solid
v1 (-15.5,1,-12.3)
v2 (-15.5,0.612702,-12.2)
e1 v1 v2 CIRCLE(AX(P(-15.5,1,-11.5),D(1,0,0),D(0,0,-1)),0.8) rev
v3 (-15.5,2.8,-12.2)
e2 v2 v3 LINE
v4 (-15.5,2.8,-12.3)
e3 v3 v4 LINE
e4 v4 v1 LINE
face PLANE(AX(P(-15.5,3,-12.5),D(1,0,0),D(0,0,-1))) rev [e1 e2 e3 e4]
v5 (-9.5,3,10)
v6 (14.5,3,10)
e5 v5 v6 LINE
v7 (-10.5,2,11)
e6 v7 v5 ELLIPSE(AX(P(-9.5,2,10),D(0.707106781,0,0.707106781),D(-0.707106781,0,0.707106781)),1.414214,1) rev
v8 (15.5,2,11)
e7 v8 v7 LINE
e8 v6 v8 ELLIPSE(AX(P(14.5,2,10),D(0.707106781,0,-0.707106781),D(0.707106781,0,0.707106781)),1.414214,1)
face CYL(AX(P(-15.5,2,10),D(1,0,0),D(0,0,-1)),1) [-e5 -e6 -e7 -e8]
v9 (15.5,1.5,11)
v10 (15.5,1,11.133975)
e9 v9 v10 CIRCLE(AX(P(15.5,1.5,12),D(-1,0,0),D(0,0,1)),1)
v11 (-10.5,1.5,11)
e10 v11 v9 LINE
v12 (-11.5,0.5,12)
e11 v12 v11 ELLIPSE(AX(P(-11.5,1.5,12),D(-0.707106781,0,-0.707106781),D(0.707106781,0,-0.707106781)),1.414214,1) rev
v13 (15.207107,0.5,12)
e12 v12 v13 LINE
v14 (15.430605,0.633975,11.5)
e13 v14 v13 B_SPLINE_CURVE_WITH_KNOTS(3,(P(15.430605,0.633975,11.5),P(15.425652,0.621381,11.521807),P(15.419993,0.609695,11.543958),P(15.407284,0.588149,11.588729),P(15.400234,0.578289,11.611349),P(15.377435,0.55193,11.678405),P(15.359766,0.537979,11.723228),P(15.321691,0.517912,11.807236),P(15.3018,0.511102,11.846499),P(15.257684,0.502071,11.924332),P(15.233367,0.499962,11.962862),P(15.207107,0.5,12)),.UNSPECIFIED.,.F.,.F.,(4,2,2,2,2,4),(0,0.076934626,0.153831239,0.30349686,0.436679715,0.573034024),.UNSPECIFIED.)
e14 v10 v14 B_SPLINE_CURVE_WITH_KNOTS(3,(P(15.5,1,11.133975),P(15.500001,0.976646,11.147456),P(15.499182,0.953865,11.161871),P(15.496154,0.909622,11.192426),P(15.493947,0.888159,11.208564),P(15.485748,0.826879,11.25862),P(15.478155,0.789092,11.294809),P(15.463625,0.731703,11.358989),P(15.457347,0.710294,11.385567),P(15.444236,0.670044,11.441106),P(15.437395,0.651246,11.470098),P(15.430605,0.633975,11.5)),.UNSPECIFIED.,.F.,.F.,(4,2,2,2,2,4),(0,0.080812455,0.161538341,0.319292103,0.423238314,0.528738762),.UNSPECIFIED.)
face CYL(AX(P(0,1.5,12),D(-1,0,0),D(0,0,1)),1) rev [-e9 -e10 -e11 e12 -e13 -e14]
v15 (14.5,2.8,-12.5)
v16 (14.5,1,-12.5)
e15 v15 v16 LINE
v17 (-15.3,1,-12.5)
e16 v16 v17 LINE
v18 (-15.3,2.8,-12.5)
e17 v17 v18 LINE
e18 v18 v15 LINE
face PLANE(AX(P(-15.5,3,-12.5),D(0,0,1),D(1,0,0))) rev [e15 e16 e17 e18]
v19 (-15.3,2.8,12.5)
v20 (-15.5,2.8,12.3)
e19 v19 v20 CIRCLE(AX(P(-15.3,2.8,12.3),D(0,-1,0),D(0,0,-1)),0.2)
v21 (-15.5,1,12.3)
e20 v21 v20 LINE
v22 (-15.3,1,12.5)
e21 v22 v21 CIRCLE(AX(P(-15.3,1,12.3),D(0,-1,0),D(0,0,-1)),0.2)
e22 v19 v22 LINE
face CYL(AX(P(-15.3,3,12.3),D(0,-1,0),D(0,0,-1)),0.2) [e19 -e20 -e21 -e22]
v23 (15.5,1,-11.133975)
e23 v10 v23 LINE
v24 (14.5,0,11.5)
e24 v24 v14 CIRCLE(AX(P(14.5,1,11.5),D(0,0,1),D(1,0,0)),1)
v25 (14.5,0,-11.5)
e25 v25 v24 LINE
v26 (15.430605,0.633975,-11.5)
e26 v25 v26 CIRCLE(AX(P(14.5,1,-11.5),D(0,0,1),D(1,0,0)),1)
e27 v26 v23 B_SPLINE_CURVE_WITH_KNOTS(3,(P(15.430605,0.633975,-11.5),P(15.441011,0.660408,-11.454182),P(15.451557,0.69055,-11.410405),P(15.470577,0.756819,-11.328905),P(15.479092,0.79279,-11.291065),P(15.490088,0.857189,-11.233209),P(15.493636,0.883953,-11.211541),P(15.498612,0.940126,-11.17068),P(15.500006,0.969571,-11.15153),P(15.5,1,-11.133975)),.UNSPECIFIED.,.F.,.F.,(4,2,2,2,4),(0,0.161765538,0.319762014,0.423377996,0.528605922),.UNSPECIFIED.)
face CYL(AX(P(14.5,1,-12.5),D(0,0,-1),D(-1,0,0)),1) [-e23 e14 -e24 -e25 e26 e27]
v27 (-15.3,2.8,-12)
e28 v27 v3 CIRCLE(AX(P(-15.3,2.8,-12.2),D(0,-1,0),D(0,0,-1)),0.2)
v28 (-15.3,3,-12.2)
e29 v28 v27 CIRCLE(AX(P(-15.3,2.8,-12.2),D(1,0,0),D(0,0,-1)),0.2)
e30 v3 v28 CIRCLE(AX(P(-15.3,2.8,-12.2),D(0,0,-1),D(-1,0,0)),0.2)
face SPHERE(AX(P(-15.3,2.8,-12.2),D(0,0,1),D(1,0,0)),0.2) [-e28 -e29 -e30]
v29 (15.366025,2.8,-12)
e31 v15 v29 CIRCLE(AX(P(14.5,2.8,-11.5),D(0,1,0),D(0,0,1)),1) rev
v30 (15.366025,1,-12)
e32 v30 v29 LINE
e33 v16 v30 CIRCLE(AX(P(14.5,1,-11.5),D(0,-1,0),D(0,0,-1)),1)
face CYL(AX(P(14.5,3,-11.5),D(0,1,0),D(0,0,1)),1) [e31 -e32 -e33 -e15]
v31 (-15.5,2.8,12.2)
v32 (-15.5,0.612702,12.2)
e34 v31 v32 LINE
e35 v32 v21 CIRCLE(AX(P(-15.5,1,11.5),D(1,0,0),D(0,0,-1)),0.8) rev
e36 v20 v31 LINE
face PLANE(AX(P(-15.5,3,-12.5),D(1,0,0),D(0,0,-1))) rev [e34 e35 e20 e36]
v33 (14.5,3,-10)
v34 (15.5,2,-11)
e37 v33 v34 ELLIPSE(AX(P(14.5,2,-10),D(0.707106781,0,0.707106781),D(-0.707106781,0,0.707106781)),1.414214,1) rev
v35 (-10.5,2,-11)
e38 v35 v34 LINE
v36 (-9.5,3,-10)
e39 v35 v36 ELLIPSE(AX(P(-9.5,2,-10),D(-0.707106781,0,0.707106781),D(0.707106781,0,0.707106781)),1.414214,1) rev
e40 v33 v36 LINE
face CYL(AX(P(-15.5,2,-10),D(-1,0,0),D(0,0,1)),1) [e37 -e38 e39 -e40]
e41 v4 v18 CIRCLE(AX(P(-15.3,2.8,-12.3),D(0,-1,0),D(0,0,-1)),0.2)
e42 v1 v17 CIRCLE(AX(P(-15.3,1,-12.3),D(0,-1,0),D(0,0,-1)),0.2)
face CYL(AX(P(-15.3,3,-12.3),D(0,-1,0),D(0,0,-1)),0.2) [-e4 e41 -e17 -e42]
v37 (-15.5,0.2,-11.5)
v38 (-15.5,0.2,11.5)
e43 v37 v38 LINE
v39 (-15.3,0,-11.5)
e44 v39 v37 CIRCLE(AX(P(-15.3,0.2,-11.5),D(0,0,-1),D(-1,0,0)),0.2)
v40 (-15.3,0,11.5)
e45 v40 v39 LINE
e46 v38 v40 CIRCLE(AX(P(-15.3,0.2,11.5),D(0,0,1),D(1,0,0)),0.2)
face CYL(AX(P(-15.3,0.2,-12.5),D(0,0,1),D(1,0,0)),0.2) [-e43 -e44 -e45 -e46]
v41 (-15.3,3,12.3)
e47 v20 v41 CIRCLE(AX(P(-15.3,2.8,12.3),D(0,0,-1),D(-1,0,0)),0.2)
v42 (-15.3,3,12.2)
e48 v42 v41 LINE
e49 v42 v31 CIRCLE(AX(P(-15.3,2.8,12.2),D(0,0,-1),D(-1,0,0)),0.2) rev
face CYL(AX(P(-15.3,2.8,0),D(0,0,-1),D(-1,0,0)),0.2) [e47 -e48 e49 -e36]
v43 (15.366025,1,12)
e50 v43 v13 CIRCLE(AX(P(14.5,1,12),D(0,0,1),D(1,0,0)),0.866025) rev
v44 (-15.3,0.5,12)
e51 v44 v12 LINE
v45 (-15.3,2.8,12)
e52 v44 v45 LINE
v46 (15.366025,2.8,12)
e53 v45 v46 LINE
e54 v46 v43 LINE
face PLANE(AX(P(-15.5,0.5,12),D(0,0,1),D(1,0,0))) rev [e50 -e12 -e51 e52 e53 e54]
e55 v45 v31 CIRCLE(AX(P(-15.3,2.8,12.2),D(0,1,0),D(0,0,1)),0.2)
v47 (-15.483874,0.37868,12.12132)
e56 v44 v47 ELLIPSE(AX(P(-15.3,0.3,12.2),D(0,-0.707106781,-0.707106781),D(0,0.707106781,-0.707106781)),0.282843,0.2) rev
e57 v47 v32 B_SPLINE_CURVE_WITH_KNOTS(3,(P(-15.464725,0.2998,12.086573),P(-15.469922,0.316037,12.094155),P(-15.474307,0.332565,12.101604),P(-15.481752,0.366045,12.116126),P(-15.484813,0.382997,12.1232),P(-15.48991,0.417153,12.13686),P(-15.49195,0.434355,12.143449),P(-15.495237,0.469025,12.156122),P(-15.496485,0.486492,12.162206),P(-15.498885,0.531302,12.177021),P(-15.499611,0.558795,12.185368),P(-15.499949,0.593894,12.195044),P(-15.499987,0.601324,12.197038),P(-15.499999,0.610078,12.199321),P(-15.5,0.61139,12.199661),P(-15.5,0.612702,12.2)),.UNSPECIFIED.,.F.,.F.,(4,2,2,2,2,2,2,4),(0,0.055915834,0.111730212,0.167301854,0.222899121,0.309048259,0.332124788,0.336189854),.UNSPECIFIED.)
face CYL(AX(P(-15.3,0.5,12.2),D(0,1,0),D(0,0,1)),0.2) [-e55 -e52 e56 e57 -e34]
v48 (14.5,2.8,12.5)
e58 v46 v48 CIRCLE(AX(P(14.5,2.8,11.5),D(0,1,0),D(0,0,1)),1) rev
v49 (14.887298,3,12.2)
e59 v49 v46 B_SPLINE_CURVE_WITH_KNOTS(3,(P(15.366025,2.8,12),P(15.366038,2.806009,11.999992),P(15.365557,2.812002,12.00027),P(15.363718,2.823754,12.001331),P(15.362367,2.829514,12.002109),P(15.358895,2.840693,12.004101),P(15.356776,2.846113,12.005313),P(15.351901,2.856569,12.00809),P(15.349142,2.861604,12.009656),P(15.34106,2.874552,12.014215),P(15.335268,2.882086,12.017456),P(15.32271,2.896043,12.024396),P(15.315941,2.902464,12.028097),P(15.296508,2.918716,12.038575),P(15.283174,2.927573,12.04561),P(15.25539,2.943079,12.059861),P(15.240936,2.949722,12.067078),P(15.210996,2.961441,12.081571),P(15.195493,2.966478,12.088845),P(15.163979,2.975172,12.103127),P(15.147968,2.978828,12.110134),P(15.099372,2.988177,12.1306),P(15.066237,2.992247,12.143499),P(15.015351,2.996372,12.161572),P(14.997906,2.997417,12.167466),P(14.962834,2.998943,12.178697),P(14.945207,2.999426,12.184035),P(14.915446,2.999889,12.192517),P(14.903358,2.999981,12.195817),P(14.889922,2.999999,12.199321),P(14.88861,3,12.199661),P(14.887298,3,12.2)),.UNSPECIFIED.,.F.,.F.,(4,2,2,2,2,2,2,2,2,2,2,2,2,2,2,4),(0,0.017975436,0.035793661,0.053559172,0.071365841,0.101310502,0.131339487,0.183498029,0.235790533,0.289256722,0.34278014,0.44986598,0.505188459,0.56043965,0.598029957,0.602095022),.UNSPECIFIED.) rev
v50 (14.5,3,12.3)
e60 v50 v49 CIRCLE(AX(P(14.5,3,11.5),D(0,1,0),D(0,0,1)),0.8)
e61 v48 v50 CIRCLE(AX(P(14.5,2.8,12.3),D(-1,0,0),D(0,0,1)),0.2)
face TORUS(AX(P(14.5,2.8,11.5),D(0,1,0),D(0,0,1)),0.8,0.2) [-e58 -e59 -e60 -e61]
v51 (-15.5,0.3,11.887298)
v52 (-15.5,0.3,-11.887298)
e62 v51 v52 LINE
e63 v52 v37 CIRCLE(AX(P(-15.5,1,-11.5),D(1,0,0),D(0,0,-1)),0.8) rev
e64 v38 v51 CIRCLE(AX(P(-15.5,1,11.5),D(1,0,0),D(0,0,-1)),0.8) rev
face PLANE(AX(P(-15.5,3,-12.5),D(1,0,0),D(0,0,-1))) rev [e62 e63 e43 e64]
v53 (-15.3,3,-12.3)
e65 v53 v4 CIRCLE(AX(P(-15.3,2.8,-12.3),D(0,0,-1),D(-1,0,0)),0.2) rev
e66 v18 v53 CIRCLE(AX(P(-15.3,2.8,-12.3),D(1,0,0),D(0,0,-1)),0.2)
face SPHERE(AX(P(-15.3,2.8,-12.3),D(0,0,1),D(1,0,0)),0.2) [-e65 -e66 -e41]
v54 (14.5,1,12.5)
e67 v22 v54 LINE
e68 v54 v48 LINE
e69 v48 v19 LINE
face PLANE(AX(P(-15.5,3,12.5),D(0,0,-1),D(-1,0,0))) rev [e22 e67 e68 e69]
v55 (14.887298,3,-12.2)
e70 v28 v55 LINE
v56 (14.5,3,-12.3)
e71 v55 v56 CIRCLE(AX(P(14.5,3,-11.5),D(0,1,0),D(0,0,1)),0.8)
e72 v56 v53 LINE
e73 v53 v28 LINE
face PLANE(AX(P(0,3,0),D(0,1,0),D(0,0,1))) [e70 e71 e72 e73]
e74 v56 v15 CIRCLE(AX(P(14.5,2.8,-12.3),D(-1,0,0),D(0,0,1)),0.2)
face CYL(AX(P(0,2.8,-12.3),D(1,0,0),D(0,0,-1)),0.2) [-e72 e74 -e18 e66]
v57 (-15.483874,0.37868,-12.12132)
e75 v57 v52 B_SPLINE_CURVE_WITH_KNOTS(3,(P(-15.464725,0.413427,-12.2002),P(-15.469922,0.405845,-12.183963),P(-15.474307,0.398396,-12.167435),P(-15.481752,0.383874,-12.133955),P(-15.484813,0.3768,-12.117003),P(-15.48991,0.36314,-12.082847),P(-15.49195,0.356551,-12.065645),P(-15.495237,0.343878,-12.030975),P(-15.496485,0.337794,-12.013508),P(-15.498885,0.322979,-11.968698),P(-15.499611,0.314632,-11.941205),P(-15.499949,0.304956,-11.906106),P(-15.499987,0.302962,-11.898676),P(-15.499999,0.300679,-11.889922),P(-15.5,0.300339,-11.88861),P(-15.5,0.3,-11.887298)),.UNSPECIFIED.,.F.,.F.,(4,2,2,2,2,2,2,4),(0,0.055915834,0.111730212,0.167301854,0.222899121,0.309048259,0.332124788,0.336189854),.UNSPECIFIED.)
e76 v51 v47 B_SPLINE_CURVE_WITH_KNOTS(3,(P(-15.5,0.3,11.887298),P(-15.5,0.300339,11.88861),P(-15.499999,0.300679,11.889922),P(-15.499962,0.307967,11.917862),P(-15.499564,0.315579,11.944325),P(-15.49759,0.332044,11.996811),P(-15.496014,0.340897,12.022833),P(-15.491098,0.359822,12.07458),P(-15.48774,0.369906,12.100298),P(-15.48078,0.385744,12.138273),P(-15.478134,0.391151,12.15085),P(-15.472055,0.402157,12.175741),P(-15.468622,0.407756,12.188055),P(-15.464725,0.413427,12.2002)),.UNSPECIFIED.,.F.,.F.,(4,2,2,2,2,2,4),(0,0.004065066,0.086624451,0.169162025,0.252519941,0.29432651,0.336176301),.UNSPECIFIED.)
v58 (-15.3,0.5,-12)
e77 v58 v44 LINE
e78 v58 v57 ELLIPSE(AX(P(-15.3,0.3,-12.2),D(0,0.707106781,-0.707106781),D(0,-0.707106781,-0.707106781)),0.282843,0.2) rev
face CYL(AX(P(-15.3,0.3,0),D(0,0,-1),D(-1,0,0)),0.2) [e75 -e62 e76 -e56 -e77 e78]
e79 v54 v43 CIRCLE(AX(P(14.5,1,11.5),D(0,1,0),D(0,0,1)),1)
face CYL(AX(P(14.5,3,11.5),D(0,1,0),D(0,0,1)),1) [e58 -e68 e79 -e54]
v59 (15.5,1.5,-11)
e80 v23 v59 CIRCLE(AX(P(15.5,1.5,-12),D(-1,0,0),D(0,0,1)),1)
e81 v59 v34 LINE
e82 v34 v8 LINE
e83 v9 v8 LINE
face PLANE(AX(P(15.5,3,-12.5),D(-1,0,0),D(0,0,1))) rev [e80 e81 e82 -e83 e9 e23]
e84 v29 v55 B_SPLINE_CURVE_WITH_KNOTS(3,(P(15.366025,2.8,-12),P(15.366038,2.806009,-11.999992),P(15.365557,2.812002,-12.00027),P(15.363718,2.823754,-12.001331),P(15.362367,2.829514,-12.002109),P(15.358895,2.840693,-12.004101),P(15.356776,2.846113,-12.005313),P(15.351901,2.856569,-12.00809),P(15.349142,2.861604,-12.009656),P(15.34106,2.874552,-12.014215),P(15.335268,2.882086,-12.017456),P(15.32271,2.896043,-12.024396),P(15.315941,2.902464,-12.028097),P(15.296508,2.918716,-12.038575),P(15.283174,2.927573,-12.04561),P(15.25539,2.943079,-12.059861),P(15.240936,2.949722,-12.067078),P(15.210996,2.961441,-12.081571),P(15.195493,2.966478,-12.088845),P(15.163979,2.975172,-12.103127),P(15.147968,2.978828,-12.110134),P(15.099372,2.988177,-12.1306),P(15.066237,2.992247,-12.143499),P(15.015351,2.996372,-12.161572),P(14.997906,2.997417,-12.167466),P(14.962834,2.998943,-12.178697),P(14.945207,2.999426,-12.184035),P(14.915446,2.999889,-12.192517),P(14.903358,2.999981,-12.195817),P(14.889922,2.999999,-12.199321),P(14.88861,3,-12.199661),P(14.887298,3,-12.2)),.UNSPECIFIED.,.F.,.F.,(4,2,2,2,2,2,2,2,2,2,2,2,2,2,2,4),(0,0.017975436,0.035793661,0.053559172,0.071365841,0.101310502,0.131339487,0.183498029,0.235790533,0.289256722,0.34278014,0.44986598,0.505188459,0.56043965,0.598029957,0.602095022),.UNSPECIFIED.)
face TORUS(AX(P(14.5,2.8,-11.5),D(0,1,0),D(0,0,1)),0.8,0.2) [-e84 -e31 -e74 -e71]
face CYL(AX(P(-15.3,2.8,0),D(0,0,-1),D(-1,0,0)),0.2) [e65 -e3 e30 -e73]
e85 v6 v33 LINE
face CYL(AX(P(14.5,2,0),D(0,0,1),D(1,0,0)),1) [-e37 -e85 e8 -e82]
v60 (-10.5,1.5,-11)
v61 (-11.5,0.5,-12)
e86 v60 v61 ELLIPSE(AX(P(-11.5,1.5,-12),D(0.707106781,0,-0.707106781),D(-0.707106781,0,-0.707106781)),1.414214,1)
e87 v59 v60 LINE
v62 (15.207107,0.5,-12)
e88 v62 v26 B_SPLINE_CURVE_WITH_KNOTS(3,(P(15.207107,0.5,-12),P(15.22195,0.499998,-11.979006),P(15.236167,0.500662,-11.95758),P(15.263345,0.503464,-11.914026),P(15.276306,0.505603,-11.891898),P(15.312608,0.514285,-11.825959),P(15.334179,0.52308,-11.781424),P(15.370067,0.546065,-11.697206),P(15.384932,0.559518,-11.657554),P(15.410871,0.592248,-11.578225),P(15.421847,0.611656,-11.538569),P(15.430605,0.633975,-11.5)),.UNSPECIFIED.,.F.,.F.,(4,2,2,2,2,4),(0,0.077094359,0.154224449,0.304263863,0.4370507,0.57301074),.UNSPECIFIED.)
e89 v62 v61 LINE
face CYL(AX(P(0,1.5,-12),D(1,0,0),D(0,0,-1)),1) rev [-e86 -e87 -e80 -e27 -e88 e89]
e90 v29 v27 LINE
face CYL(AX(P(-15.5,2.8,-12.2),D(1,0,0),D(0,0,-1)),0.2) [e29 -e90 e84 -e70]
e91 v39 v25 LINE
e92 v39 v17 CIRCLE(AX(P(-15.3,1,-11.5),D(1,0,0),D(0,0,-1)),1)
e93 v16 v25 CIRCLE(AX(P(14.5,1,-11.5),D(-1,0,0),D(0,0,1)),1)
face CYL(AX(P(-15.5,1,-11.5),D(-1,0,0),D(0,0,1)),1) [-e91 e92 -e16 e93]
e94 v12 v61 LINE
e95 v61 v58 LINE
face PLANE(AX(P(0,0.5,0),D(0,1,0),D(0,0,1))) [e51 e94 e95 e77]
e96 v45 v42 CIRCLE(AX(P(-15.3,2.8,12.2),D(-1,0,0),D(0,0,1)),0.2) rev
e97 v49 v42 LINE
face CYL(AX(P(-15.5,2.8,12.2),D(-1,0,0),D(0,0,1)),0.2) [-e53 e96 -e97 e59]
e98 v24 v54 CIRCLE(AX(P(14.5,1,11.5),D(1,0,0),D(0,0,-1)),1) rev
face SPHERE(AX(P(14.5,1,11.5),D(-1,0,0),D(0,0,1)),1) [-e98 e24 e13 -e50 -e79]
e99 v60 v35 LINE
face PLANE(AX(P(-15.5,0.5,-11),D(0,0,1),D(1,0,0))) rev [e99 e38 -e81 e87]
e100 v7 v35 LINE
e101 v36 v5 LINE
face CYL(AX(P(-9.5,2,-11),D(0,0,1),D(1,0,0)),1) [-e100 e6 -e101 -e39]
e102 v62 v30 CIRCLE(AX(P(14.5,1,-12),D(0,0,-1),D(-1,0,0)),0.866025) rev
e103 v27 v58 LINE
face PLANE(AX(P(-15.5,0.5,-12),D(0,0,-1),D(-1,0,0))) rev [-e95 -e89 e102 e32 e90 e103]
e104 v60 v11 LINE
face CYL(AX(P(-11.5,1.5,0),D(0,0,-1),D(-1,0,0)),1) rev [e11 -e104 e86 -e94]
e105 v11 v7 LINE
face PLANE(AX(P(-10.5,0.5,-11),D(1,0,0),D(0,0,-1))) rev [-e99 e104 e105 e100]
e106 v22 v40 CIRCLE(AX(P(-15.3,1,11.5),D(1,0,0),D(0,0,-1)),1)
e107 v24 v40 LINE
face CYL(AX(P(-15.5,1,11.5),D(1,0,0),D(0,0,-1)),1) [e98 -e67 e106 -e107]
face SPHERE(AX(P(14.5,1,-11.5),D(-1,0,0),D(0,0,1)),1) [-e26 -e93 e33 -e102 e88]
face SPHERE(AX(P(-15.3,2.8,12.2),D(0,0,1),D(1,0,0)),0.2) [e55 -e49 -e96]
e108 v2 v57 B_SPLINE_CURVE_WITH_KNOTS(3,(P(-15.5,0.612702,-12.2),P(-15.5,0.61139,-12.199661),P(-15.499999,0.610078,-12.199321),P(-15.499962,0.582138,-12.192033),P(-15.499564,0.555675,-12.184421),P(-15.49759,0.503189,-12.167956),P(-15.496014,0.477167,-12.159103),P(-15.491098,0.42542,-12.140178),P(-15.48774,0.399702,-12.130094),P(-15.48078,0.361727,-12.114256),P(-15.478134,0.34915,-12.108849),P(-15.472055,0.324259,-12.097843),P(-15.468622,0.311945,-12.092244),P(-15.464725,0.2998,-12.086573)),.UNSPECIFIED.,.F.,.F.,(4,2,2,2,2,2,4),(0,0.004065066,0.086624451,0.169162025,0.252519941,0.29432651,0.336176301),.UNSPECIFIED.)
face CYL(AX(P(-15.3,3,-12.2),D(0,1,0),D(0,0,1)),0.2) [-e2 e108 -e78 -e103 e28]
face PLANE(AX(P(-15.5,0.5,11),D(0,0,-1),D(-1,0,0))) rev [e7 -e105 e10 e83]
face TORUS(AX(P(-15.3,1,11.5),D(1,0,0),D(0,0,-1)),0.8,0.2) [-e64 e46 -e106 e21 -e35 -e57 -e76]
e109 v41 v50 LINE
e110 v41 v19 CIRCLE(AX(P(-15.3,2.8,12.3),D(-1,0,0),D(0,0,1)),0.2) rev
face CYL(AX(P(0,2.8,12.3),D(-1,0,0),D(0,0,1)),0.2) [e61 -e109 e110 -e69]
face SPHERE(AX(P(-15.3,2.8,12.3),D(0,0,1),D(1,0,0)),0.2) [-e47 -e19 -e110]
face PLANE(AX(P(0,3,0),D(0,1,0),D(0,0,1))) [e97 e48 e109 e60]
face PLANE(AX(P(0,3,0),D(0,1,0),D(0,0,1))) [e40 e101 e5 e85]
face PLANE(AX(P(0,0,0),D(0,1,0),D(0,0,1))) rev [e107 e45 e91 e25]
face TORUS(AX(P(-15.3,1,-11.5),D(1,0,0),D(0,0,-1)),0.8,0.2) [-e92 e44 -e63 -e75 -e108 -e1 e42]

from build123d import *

# Parameters (mm, degrees)
SKETCH_2_W          = 31
SKETCH_2_H          = 25
EXTRUDE_1_DEPTH     = 3
SKETCH_3_W          = 31
SKETCH_3_H          = 1
CUT_EXTRUDE_1_DEPTH = 2.5
SKETCH_4_W          = 5
SKETCH_4_H          = 22
CUT_EXTRUDE_2_DEPTH = 2.5
FILLET_11_R         = 1
FILLET_12_R         = 1
FILLET_13_R         = 1
FILLET_18_R         = 1
FILLET_19_R         = 1
FILLET_20_R         = 1
FILLET_21_R         = 1
FILLET_22_R         = 0.2
FILLET_23_R         = 0.2
FILLET_24_R         = 0.2


# Some blends are built 0.0001 mm under size
with BuildPart() as part:
    # 草图2 → 凸台-拉伸1 (new body)
    with BuildSketch(Plane(origin=(0, 0, 0), x_dir=(1, 0, 0), z_dir=(0, 1, 0))):
        Rectangle(SKETCH_2_W, SKETCH_2_H)
    extrude(amount=EXTRUDE_1_DEPTH)

    # 草图3 → 切除-拉伸1 (cut)
    with BuildSketch(Plane(origin=(0, 3, 0), x_dir=(1, 0, 0), z_dir=(0, 1, 0))):
        with Locations((0, 11.5)):
            Rectangle(SKETCH_3_W, SKETCH_3_H)
        with Locations((0, -11.5)):
            Rectangle(SKETCH_3_W, SKETCH_3_H)
    extrude(amount=-CUT_EXTRUDE_1_DEPTH, mode=Mode.SUBTRACT)

    # 草图4 → 切除-拉伸2 (cut)
    with BuildSketch(Plane(origin=(0, 3, 0), x_dir=(1, 0, 0), z_dir=(0, 1, 0))):
        with Locations((-13, 0)):
            Rectangle(SKETCH_4_W, SKETCH_4_H)
    extrude(amount=-CUT_EXTRUDE_2_DEPTH, mode=Mode.SUBTRACT)

    # 圆角11
    fillet_11_edges = [part.edges().sort_by_distance(p)[0] for p in [
        (0, 0, 12.5),
    ]]
    fillet(fillet_11_edges, radius=FILLET_11_R)

    # 圆角12
    fillet_12_edges = [part.edges().sort_by_distance(p)[0] for p in [
        (0, 0, -12.5),
    ]]
    fillet(fillet_12_edges, radius=FILLET_12_R)

    # 圆角13
    # the kernel refuses this fillet: 1 mm, written as the material it takes off along each edge
    with BuildSketch(Plane(origin=(15.5, 1, 12.5), x_dir=(0, 0, -1), z_dir=(0, 1, 0))) as fillet_13_piece_1:
        with BuildLine():
            CenterArc((FILLET_13_R, FILLET_13_R), FILLET_13_R, 180, 90)
            Line((0, FILLET_13_R), (0, 0))
            Line((0, 0), (FILLET_13_R, 0))
        make_face()
    extrude(amount=4.5, mode=Mode.SUBTRACT)
    with BuildSketch(Plane(origin=(15.5, 1, -12.5), x_dir=(0, 0, 1), z_dir=(0, 1, 0))) as fillet_13_piece_2:
        with BuildLine():
            CenterArc((FILLET_13_R, -FILLET_13_R), FILLET_13_R, 90, 90)
            Line((0, -FILLET_13_R), (0, 0))
            Line((0, 0), (FILLET_13_R, 0))
        make_face()
    extrude(amount=4.5, mode=Mode.SUBTRACT)
    with BuildSketch(Plane(origin=(15.5, 0, -11.5), x_dir=(0, 1, 0), z_dir=(0, 0, 1))) as fillet_13_piece_3:
        with BuildLine():
            CenterArc((FILLET_13_R, FILLET_13_R), FILLET_13_R, 180, 90)
            Line((0, FILLET_13_R), (0, 0))
            Line((0, 0), (FILLET_13_R, 0))
        make_face()
    extrude(amount=23, mode=Mode.SUBTRACT)
    with BuildSketch(Plane(origin=(15.5, 1, -11.5), x_dir=(0, -1, 0), z_dir=(0, 0, 1))) as fillet_13_piece_4:
        with BuildLine():
            CenterArc((1 - FILLET_13_R, -FILLET_13_R), FILLET_13_R, 0, 90)
            Line((1, -FILLET_13_R), (1, 0))
            Line((1, 0), (1 - FILLET_13_R, 0))
        make_face()
    revolve(axis=Axis((15.5, 1, -11.5), (1, 0, 0)), revolution_arc=90, mode=Mode.SUBTRACT)
    with BuildSketch(Plane(origin=(15.5, 1, 11.5), x_dir=(0, 0, 1), z_dir=(0, 1, 0))) as fillet_13_piece_5:
        with BuildLine():
            CenterArc((1 - FILLET_13_R, -FILLET_13_R), FILLET_13_R, 0, 90)
            Line((1, -FILLET_13_R), (1, 0))
            Line((1, 0), (1 - FILLET_13_R, 0))
        make_face()
    revolve(axis=Axis((15.5, 1, 11.5), (1, 0, 0)), revolution_arc=90, mode=Mode.SUBTRACT)

    # 圆角18
    fillet_18_edges = [part.edges().sort_by_distance(p)[0] for p in [
        (15.5, 3, 0),
        (2.5, 3, 11),
        (2.5, 3, -11),
        (-10.5, 3, 0),
    ]]
    fillet(fillet_18_edges, radius=FILLET_18_R)

    # 圆角19
    fillet_19_edges = [part.edges().sort_by_distance(p)[0] for p in [
        (-10.5, 0.5, 0),
    ]]
    fillet(fillet_19_edges, radius=FILLET_19_R)

    # 圆角20
    fillet_20_edges = [part.edges().sort_by_distance(p)[0] for p in [
        (1.933012702, 0.5, -11),
    ]]
    fillet(fillet_20_edges, radius=FILLET_20_R - 0.0001)  # a hair under: the kernel refuses the full size

    # 圆角21
    fillet_21_edges = [part.edges().sort_by_distance(p)[0] for p in [
        (1.933012702, 0.5, 11),
    ]]
    fillet(fillet_21_edges, radius=FILLET_21_R - 0.0001)  # a hair under: the kernel refuses the full size

    # 圆角22
    fillet_22_edges = [part.edges().sort_by_distance(p)[0] for p in [
        (-15.5, 3, 12.25),
        (-0.5, 3, 12.5),
        (-0.066987298, 3, 12),
        (15, 3, 12.366025404),
    ]]
    fillet(fillet_22_edges, radius=FILLET_22_R)

    # 圆角23
    fillet_23_edges = [part.edges().sort_by_distance(p)[0] for p in [
        (-15.5, 3, -12.25),
        (-0.5, 3, -12.5),
        (-0.066987298, 3, -12),
        (15, 3, -12.366025404),
    ]]
    fillet(fillet_23_edges, radius=FILLET_23_R)

    # 圆角24
    # the kernel refuses this fillet: 0.2 mm, written as the material it takes off along each edge
    with BuildSketch(Plane(origin=(-15.3, 2.8, 12.2), x_dir=(0, 0, -1), z_dir=(-1, 0, 0))) as fillet_24_piece_1_section:
        Polygon((0, 0), (FILLET_24_R, 0), (FILLET_24_R, -FILLET_24_R), (0, -FILLET_24_R), align=None)
    fillet_24_piece_1 = extrude(amount=FILLET_24_R, mode=Mode.PRIVATE)
    fillet_24_piece_1 = fillet_24_piece_1 - Plane(origin=(-15.3, 2.8, 12.2), x_dir=(0, -0.7071067811865475, 0.7071067811865475), z_dir=(-1, 0, 0)) * Sphere(FILLET_24_R, mode=Mode.PRIVATE)
    add(fillet_24_piece_1, mode=Mode.SUBTRACT)
    with BuildSketch(Plane(origin=(-15.3, 2.8, 12.3), x_dir=(0, 0, 1), z_dir=(-1, 0, 0))) as fillet_24_piece_2_section:
        Polygon((0, 0), (FILLET_24_R, 0), (FILLET_24_R, FILLET_24_R), (0, FILLET_24_R), align=None)
    fillet_24_piece_2 = extrude(amount=FILLET_24_R, mode=Mode.PRIVATE)
    fillet_24_piece_2 = fillet_24_piece_2 - Plane(origin=(-15.3, 2.8, 12.3), x_dir=(0, -0.7071067811865475, -0.7071067811865475), z_dir=(-1, 0, 0)) * Sphere(FILLET_24_R, mode=Mode.PRIVATE)
    add(fillet_24_piece_2, mode=Mode.SUBTRACT)
    with BuildSketch(Plane(origin=(-15.3, 2.8, -12.3), x_dir=(0, 0, -1), z_dir=(-1, 0, 0))) as fillet_24_piece_3_section:
        Polygon((0, 0), (FILLET_24_R, 0), (FILLET_24_R, -FILLET_24_R), (0, -FILLET_24_R), align=None)
    fillet_24_piece_3 = extrude(amount=FILLET_24_R, mode=Mode.PRIVATE)
    fillet_24_piece_3 = fillet_24_piece_3 - Plane(origin=(-15.3, 2.8, -12.3), x_dir=(0, -0.7071067811865475, 0.7071067811865475), z_dir=(-1, 0, 0)) * Sphere(FILLET_24_R, mode=Mode.PRIVATE)
    add(fillet_24_piece_3, mode=Mode.SUBTRACT)
    with BuildSketch(Plane(origin=(-15.3, 2.8, -12.2), x_dir=(0, 0, 1), z_dir=(-1, 0, 0))) as fillet_24_piece_4_section:
        Polygon((0, 0), (FILLET_24_R, 0), (FILLET_24_R, FILLET_24_R), (0, FILLET_24_R), align=None)
    fillet_24_piece_4 = extrude(amount=FILLET_24_R, mode=Mode.PRIVATE)
    fillet_24_piece_4 = fillet_24_piece_4 - Plane(origin=(-15.3, 2.8, -12.2), x_dir=(0, -0.7071067811865475, -0.7071067811865475), z_dir=(-1, 0, 0)) * Sphere(FILLET_24_R, mode=Mode.PRIVATE)
    add(fillet_24_piece_4, mode=Mode.SUBTRACT)
    with BuildSketch(Plane(origin=(-15.5, 1, 12.5), x_dir=(0, 0, -1), z_dir=(0, 1, 0))) as fillet_24_piece_5:
        with BuildLine():
            CenterArc((FILLET_24_R, -FILLET_24_R), FILLET_24_R, 90, 90)
            Line((0, -FILLET_24_R), (0, 0))
            Line((0, 0), (FILLET_24_R, 0))
        make_face()
    extrude(amount=1.8, mode=Mode.SUBTRACT)
    with BuildSketch(Plane(origin=(-15.5, 1, -12.5), x_dir=(0, 0, 1), z_dir=(0, 1, 0))) as fillet_24_piece_6:
        with BuildLine():
            CenterArc((FILLET_24_R, FILLET_24_R), FILLET_24_R, 180, 90)
            Line((0, FILLET_24_R), (0, 0))
            Line((0, 0), (FILLET_24_R, 0))
        make_face()
    extrude(amount=1.8, mode=Mode.SUBTRACT)
    with BuildSketch(Plane(origin=(-15.5, 0.5, 12), x_dir=(0, -1, 0), z_dir=(0, 0, -1))) as fillet_24_piece_7:
        with BuildLine():
            CenterArc((FILLET_24_R, -FILLET_24_R), FILLET_24_R, 90, 90)
            Line((0, -FILLET_24_R), (0, 0))
            Line((0, 0), (FILLET_24_R, 0))
        make_face()
    extrude(amount=24, mode=Mode.SUBTRACT)
    with BuildSketch(Plane(origin=(-15.5, 2.8, -12), x_dir=(0, 0, -1), z_dir=(0, -1, 0))) as fillet_24_piece_8:
        with BuildLine():
            CenterArc((FILLET_24_R, FILLET_24_R), FILLET_24_R, 180, 90)
            Line((0, FILLET_24_R), (0, 0))
            Line((0, 0), (FILLET_24_R, 0))
        make_face()
    extrude(amount=2.3, mode=Mode.SUBTRACT)
    with BuildSketch(Plane(origin=(-15.5, 2.8, 12), x_dir=(0, 0, 1), z_dir=(0, -1, 0))) as fillet_24_piece_9:
        with BuildLine():
            CenterArc((FILLET_24_R, -FILLET_24_R), FILLET_24_R, 90, 90)
            Line((0, -FILLET_24_R), (0, 0))
            Line((0, 0), (FILLET_24_R, 0))
        make_face()
    extrude(amount=2.3, mode=Mode.SUBTRACT)
    with BuildSketch(Plane(origin=(-15.5, 1, 11.5), x_dir=(0, 0, 1), z_dir=(0, 1, 0))) as fillet_24_piece_10:
        with BuildLine():
            CenterArc((1 - FILLET_24_R, FILLET_24_R), FILLET_24_R, 270, 90)
            Line((1, FILLET_24_R), (1, 0))
            Line((1, 0), (1 - FILLET_24_R, 0))
        make_face()
    revolve(axis=Axis((-15.5, 1, 11.5), (1, 0, 0)), revolution_arc=90, mode=Mode.SUBTRACT)
    with BuildSketch(Plane(origin=(-15.5, 0, 11.5), x_dir=(0, 1, 0), z_dir=(0, 0, -1))) as fillet_24_piece_11:
        with BuildLine():
            CenterArc((FILLET_24_R, FILLET_24_R), FILLET_24_R, 180, 90)
            Line((0, FILLET_24_R), (0, 0))
            Line((0, 0), (FILLET_24_R, 0))
        make_face()
    extrude(amount=23, mode=Mode.SUBTRACT)
    with BuildSketch(Plane(origin=(-15.5, 1, -11.5), x_dir=(0, -1, 0), z_dir=(0, 0, 1))) as fillet_24_piece_12:
        with BuildLine():
            CenterArc((1 - FILLET_24_R, FILLET_24_R), FILLET_24_R, 270, 90)
            Line((1, FILLET_24_R), (1, 0))
            Line((1, 0), (1 - FILLET_24_R, 0))
        make_face()
    revolve(axis=Axis((-15.5, 1, -11.5), (1, 0, 0)), revolution_arc=90, mode=Mode.SUBTRACT)
    with BuildSketch(Plane(origin=(-15.5, 0.5, 12.5), x_dir=(0, -1, 0), z_dir=(0, 0, -1))) as fillet_24_piece_13a_section:
        with BuildLine():
            CenterArc((FILLET_24_R, -FILLET_24_R), FILLET_24_R, 90, 90)
            Line((0, -FILLET_24_R), (0, 0))
            Line((0, 0), (FILLET_24_R, 0))
        make_face()
    fillet_24_piece_13a = extrude(amount=24.5, mode=Mode.PRIVATE)
    fillet_24_piece_13a = split(fillet_24_piece_13a, bisect_by=Plane(origin=(-15.454720977, 0.454720977, 12), z_dir=(0, 0, 1)), keep=Keep.TOP, mode=Mode.PRIVATE)
    with BuildSketch(Plane(origin=(-15.5, 2.8, 12), x_dir=(0, 0, 1), z_dir=(0, -1, 0))) as fillet_24_piece_13b_section:
        with BuildLine():
            CenterArc((FILLET_24_R, -FILLET_24_R), FILLET_24_R, 90, 90)
            Line((0, -FILLET_24_R), (0, 0))
            Line((0, 0), (FILLET_24_R, 0))
        make_face()
    fillet_24_piece_13b = extrude(amount=2.8, mode=Mode.PRIVATE)
    fillet_24_piece_13b = split(fillet_24_piece_13b, bisect_by=Plane(origin=(-15.454720977, 0.5, 12.045279023), z_dir=(0, -1, 0)), keep=Keep.TOP, mode=Mode.PRIVATE)
    fillet_24_piece_13 = fillet_24_piece_13a & fillet_24_piece_13b
    add(fillet_24_piece_13, mode=Mode.SUBTRACT)
    with BuildSketch(Plane(origin=(-15.5, 2.8, -12), x_dir=(0, 0, -1), z_dir=(0, -1, 0))) as fillet_24_piece_14a_section:
        with BuildLine():
            CenterArc((FILLET_24_R, FILLET_24_R), FILLET_24_R, 180, 90)
            Line((0, FILLET_24_R), (0, 0))
            Line((0, 0), (FILLET_24_R, 0))
        make_face()
    fillet_24_piece_14a = extrude(amount=2.8, mode=Mode.PRIVATE)
    fillet_24_piece_14a = split(fillet_24_piece_14a, bisect_by=Plane(origin=(-15.454720977, 0.5, -12.045279023), z_dir=(0, -1, 0)), keep=Keep.TOP, mode=Mode.PRIVATE)
    with BuildSketch(Plane(origin=(-15.5, 0.5, 12), x_dir=(0, -1, 0), z_dir=(0, 0, -1))) as fillet_24_piece_14b_section:
        with BuildLine():
            CenterArc((FILLET_24_R, -FILLET_24_R), FILLET_24_R, 90, 90)
            Line((0, -FILLET_24_R), (0, 0))
            Line((0, 0), (FILLET_24_R, 0))
        make_face()
    fillet_24_piece_14b = extrude(amount=24.5, mode=Mode.PRIVATE)
    fillet_24_piece_14b = split(fillet_24_piece_14b, bisect_by=Plane(origin=(-15.454720977, 0.454720977, -12), z_dir=(0, 0, -1)), keep=Keep.TOP, mode=Mode.PRIVATE)
    fillet_24_piece_14 = fillet_24_piece_14a & fillet_24_piece_14b
    add(fillet_24_piece_14, mode=Mode.SUBTRACT)


solid = part.part
